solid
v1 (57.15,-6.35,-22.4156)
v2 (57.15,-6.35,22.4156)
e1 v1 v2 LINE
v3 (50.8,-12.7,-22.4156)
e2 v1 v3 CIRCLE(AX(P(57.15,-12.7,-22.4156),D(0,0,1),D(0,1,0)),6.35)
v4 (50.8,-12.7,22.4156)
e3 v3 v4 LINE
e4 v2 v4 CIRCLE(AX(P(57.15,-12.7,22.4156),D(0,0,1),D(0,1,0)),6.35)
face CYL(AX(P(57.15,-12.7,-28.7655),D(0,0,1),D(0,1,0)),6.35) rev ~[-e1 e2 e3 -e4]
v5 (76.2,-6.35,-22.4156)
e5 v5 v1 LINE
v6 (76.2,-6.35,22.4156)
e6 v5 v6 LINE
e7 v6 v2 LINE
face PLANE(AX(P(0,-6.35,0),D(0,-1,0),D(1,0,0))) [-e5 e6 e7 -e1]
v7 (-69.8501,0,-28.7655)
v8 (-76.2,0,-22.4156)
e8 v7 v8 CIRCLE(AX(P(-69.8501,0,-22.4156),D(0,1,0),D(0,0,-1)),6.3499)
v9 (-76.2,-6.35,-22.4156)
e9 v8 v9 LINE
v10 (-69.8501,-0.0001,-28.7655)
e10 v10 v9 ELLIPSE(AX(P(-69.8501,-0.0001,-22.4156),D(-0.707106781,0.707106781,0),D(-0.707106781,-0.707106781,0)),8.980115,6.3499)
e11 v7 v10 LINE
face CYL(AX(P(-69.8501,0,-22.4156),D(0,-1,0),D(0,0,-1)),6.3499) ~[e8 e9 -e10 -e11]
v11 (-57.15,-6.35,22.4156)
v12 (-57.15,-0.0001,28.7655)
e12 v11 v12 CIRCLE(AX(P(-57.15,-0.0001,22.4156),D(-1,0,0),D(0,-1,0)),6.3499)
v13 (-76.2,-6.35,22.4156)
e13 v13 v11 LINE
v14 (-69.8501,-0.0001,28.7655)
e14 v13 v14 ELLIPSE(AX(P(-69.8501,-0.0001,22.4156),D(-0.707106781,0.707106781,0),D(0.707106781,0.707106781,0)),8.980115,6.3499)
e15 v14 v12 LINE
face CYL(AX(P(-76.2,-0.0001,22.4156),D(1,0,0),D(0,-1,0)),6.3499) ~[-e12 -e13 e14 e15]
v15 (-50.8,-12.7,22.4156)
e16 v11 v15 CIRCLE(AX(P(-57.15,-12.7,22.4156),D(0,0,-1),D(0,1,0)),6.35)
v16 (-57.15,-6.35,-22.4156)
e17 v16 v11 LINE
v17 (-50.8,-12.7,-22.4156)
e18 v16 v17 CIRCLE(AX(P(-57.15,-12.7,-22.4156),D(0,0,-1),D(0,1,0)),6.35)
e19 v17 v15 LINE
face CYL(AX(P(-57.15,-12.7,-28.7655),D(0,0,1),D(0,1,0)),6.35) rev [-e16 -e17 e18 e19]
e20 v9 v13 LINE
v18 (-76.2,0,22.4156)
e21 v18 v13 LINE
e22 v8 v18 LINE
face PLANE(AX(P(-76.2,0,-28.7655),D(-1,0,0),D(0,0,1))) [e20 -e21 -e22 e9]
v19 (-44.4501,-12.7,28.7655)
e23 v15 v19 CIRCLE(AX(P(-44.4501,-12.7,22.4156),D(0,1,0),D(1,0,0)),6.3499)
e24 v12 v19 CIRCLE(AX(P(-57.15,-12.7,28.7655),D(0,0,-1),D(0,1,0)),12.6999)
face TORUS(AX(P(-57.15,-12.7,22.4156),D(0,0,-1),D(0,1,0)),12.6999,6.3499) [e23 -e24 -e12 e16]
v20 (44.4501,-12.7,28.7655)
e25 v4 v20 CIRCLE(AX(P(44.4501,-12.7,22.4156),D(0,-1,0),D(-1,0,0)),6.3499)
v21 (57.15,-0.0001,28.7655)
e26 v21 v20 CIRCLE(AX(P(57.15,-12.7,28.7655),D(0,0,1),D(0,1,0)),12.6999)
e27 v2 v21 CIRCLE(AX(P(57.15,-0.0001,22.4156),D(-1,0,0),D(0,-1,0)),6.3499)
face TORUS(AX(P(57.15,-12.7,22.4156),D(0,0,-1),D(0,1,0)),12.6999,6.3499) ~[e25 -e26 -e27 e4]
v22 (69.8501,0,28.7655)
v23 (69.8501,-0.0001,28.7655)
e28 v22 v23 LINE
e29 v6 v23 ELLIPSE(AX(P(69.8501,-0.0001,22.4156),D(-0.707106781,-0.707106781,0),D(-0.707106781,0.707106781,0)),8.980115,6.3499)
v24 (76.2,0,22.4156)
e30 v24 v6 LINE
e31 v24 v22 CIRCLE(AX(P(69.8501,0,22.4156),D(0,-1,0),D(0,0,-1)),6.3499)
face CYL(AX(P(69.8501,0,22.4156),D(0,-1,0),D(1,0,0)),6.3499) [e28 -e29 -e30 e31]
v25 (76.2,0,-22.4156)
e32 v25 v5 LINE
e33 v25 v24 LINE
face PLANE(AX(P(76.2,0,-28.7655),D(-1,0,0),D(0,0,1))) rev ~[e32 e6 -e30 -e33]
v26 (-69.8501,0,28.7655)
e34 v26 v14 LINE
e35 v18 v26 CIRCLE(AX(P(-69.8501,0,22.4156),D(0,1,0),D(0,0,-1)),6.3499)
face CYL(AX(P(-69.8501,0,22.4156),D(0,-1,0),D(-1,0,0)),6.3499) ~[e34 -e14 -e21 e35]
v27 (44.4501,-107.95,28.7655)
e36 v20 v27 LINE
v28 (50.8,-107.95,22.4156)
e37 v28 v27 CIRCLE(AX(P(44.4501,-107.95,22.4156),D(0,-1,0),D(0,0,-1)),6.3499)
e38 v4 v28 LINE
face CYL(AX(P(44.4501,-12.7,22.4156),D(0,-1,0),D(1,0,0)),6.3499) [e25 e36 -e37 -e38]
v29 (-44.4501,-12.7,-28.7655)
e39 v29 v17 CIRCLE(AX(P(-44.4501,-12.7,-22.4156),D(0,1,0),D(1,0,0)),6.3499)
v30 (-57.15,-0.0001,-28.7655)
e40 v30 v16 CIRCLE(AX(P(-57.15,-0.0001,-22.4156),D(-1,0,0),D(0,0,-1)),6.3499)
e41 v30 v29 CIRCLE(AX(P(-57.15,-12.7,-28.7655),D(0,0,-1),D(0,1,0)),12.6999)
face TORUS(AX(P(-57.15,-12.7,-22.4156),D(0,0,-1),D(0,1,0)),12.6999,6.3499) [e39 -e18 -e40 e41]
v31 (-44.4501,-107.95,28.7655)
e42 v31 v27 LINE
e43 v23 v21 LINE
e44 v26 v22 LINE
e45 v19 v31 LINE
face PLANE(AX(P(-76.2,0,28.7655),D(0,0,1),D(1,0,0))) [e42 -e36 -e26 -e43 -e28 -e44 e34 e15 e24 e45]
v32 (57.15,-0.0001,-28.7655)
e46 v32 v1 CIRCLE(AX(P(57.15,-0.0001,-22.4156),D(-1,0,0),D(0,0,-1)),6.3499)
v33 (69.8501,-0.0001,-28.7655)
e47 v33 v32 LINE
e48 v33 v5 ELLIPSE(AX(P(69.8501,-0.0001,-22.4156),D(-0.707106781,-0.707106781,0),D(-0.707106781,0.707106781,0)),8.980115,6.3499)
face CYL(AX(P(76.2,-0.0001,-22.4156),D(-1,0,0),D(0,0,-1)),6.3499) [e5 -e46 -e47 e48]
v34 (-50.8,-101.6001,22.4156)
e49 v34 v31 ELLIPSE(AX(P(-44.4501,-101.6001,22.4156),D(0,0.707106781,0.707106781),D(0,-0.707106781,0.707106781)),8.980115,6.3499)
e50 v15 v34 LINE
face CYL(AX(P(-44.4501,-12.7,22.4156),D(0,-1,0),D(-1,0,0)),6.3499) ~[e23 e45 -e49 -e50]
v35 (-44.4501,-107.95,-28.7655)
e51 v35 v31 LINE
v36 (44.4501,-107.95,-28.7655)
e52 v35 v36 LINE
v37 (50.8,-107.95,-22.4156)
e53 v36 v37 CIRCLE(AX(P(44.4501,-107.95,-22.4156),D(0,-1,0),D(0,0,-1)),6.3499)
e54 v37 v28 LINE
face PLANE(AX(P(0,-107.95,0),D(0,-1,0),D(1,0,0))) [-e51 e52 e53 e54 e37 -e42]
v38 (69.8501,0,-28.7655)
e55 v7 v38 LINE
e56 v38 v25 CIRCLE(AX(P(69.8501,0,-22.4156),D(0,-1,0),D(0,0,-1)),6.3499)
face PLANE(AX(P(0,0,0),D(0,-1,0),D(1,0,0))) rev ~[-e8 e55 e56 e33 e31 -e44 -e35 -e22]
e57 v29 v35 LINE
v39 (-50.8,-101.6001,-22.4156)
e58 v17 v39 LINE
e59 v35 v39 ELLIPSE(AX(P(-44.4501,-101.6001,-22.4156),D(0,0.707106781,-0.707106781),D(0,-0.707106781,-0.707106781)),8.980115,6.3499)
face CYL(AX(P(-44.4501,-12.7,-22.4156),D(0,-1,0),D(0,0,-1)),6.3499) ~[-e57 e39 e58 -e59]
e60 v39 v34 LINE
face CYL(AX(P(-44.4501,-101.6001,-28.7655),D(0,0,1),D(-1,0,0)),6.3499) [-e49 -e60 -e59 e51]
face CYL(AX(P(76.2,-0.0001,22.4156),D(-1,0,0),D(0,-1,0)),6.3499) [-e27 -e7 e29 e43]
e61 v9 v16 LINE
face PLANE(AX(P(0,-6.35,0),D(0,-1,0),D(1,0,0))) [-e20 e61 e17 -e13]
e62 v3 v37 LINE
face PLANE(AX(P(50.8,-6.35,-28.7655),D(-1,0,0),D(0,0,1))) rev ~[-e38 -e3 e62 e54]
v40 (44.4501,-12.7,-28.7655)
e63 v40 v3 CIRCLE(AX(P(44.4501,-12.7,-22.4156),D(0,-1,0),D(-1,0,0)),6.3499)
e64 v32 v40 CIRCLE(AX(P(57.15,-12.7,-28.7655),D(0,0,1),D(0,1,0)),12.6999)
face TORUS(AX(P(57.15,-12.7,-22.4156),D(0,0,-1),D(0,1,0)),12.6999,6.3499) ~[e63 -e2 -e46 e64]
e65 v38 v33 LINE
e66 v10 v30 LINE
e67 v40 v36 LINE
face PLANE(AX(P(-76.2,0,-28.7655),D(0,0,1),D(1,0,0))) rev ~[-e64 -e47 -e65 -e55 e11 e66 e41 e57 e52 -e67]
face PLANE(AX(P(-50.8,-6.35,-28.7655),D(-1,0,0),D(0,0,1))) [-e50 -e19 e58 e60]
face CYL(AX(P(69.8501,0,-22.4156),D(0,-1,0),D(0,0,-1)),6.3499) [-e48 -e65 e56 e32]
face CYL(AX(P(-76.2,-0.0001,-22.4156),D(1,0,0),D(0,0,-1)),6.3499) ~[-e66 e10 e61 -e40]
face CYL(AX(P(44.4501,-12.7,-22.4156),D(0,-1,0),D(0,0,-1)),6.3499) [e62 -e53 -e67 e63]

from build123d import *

# Parameters (mm, degrees)
F0_W     = 152.4
F0_H     = 57.531
F1_DEPTH = 6.35
F2_W     = 101.6
F2_H     = 57.531
F3_DEPTH = 101.6
F4_F1_R  = 6.35
F4_F2_R  = 6.3499


# Not quite as in the source:
# - a fillet or chamfer is up to 0.001 mm smaller than in the source, because OpenCascade refuses the exact size


with BuildPart() as f1:
    # F0 (on Front) → F1 (new body)
    with BuildSketch(Plane.XZ):
        Rectangle(F0_W, F0_H)
    extrude(amount=F1_DEPTH)

    # F2 (on face) → F3 (join)
    with BuildSketch(Plane.XZ.offset(6.35)):
        Rectangle(F2_W, F2_H)
    extrude(amount=F3_DEPTH)

    # F4: fillet of radius 6.35 on 11 edges, made by hand

    # F4_f1
    f4_f1_edges = [f1.edges().sort_by_distance(p)[0] for p in [
        (50.8, -6.35, 0),
        (-50.8, -6.35, 0),
    ]]
    fillet(f4_f1_edges, radius=F4_F1_R)

    # F4_f2 (radius 6.35 in the source; OpenCascade refuses exactly that, so slightly less here)
    f4_f2_edges = [f1.edges().sort_by_distance(p)[0] for p in [
        (-76.2, -3.175, -28.7655),
        (-50.8, -60.325, -28.7655),
        (-50.8, -60.325, 28.7655),
        (50.8, -60.325, -28.7655),
        (50.8, -60.325, 28.7655),
        (-50.8, -107.95, 0),
        (-76.2, -3.175, 28.7655),
        (76.2, -3.175, 28.7655),
        (76.2, -3.175, -28.7655),
        (52.6598719395, -8.2098719395, 28.7655),
        (52.6598719395, -8.2098719395, -28.7655),
        (-52.6598719395, -8.2098719395, 28.7655),
        (-52.6598719395, -8.2098719395, -28.7655),
    ]]
    fillet(f4_f2_edges, radius=F4_F2_R)


solid = f1.part
